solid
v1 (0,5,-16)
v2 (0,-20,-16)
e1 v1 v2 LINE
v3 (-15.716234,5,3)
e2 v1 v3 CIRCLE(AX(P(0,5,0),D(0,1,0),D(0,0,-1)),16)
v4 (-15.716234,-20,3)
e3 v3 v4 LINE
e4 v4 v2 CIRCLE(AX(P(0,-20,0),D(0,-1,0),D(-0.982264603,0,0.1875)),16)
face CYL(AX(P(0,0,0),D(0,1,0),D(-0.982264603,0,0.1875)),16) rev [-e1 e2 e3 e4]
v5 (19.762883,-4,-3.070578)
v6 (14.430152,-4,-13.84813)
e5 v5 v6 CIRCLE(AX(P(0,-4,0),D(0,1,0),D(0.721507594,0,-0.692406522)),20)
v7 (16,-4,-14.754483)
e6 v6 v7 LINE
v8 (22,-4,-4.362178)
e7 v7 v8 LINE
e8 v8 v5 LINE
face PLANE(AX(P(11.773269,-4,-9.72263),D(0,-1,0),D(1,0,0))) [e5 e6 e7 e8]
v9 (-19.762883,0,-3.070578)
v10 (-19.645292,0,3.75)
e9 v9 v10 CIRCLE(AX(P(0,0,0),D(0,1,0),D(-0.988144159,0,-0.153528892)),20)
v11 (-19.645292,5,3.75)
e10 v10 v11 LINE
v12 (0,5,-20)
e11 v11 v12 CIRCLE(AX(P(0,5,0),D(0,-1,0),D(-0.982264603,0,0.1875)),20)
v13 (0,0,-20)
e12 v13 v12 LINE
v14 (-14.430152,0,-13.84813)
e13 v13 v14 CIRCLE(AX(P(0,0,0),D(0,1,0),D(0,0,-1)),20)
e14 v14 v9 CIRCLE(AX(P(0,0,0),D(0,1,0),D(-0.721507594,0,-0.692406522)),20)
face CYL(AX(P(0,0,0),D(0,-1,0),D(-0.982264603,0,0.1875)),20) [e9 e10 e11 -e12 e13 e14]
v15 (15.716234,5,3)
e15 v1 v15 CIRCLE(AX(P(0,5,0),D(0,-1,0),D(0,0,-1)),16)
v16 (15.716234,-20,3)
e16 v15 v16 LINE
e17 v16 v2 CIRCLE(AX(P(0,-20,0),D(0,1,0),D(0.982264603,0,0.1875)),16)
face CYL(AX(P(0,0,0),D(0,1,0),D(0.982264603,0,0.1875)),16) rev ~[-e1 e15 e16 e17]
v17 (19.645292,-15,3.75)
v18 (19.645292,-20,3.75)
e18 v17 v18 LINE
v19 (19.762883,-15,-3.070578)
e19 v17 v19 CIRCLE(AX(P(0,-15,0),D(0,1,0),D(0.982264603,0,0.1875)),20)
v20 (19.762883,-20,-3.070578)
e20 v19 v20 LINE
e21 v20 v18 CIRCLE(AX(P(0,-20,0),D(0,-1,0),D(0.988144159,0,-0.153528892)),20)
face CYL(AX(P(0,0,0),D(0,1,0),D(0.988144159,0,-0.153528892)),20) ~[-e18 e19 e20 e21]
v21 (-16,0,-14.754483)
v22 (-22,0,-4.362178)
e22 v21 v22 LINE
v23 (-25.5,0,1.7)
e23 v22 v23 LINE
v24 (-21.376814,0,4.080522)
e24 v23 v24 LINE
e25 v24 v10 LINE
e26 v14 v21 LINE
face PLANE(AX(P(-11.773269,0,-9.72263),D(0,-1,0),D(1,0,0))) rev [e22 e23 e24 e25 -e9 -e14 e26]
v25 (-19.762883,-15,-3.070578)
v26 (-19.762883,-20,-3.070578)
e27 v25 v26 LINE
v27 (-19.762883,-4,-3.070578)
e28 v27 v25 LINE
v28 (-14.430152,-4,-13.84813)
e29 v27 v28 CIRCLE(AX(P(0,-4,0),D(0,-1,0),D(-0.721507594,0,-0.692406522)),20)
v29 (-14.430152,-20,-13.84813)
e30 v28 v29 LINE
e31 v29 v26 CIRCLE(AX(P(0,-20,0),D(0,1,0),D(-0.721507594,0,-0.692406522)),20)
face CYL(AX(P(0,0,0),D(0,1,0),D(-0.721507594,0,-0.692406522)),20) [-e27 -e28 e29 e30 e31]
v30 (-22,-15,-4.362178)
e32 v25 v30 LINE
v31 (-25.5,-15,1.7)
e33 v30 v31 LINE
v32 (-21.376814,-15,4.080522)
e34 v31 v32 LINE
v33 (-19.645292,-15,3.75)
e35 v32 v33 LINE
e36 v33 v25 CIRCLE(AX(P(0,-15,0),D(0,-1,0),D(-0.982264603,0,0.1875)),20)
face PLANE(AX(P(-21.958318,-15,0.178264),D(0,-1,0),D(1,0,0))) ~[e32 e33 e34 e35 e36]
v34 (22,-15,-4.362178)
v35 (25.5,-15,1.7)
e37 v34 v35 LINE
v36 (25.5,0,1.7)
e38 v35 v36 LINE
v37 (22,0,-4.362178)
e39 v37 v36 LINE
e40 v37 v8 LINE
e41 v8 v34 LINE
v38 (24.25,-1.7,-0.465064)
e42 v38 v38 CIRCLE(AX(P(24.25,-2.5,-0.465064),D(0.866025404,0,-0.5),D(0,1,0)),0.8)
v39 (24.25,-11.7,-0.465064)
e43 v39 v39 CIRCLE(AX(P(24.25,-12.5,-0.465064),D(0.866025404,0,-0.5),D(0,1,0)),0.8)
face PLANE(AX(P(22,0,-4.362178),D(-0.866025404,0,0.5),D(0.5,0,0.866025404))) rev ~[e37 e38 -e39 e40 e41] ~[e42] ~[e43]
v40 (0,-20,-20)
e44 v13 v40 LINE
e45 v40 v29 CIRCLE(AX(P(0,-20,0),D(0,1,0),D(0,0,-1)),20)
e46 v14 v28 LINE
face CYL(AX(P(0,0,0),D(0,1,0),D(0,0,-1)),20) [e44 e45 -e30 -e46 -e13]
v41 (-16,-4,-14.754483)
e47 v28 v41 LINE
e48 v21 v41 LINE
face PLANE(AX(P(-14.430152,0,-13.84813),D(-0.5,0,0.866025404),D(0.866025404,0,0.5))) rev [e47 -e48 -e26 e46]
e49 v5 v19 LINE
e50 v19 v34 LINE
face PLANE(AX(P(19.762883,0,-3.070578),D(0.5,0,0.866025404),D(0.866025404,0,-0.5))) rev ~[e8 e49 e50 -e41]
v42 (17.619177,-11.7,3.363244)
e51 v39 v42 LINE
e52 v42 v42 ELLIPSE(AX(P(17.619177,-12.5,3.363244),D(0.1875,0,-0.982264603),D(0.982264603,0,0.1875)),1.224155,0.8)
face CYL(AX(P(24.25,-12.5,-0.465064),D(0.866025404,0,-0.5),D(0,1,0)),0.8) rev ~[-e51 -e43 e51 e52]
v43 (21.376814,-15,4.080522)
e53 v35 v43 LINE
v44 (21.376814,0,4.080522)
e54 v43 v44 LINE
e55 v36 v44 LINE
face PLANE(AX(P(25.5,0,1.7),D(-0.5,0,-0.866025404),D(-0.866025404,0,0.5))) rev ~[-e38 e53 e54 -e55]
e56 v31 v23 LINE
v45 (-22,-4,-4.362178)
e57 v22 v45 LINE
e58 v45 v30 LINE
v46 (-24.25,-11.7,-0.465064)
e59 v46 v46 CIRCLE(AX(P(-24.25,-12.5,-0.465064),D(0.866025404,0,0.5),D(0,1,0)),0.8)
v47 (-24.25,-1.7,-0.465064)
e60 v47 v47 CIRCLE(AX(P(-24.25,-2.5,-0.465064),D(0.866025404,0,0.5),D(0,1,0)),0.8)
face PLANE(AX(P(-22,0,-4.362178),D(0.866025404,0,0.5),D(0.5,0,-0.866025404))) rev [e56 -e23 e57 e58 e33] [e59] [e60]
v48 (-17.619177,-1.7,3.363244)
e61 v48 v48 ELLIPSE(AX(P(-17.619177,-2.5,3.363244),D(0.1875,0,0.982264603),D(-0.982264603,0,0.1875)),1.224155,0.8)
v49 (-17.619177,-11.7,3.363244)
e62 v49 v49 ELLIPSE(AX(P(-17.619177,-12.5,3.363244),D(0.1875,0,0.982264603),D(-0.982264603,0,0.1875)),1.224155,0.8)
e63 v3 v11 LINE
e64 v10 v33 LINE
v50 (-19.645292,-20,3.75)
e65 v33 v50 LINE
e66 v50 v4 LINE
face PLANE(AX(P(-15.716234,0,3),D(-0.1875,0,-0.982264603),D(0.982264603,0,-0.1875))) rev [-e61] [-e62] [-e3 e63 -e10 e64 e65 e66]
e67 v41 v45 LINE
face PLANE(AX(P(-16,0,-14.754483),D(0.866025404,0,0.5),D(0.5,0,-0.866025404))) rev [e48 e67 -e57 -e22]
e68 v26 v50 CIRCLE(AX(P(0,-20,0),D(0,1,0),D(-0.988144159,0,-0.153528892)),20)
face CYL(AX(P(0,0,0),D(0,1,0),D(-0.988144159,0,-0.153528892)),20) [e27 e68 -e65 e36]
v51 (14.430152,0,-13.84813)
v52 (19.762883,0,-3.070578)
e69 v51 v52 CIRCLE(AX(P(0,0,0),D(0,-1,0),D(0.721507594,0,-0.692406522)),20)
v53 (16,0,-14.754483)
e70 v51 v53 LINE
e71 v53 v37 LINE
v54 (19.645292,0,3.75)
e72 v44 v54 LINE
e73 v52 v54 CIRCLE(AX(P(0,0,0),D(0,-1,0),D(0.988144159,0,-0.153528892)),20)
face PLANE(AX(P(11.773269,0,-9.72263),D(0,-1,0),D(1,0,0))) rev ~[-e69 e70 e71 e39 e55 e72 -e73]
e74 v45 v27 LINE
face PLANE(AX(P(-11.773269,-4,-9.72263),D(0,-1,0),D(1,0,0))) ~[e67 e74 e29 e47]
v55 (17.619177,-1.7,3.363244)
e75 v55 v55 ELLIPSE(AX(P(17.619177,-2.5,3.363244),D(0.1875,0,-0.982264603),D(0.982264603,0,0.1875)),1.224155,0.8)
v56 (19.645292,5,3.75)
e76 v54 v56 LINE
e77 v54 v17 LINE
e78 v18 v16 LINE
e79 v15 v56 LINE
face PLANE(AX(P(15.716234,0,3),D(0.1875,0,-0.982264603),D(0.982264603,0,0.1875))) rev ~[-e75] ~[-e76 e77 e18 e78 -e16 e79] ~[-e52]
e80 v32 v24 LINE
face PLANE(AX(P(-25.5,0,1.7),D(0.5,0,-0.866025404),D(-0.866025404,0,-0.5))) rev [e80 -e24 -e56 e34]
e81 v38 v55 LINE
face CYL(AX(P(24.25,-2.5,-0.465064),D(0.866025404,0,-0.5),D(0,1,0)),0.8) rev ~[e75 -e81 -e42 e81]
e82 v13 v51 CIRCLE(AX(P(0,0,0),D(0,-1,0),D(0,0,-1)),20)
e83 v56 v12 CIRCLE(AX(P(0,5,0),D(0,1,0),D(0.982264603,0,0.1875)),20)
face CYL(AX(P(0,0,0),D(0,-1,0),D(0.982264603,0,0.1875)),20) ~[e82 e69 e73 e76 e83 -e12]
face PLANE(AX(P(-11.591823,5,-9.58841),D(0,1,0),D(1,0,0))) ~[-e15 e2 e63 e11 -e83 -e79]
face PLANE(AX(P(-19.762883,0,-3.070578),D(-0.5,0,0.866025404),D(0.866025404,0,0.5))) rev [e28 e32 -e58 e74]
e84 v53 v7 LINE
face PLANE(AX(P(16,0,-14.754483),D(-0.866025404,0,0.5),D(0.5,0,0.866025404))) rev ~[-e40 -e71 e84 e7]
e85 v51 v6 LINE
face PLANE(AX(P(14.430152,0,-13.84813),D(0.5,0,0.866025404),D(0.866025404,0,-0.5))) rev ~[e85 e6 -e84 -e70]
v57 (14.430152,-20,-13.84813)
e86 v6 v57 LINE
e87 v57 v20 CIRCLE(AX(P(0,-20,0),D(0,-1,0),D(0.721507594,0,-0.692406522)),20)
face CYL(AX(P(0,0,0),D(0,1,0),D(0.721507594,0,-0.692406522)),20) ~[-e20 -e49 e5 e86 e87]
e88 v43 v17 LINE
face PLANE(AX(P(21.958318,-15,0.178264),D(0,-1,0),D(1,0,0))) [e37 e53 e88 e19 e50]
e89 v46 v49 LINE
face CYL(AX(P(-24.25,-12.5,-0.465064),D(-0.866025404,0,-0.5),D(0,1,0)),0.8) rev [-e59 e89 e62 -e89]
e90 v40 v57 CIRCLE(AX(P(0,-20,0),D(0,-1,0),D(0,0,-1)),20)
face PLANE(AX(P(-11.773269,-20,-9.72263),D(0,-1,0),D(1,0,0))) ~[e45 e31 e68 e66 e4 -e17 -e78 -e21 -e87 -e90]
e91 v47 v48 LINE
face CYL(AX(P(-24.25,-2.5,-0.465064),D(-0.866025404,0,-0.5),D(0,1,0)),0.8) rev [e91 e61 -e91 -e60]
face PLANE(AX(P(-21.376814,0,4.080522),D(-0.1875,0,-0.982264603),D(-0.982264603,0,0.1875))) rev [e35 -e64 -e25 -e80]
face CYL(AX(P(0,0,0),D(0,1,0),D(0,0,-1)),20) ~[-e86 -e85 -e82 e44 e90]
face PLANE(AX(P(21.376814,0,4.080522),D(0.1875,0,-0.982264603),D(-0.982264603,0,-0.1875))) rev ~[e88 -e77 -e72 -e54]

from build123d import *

# Parameters (mm, degrees)
F1_DEPTH = 20
F2_DEPTH = 5
F3_DEPTH = 4
F4_DEPTH = 15
F5_R     = 0.8
F6_DEPTH = 8.5841977808


# Not quite as in the source:
# - a feature names something its author has since deleted; it is built from what else it names


with BuildPart() as f1:
    # F0 (on Front) → F1 (new body)
    with BuildSketch(Plane.XZ):
        with BuildLine():
            ThreePointArc((15.7162336455, 3), (12.3288280059, -10.1980390272), (0, -16))
            Line((0, -16), (0, -20))
            ThreePointArc((0, -20), (7.8433854689, -18.397861408), (14.4301518825, -13.8481304387))
            ThreePointArc((14.4301518825, -13.8481304387), (17.9256749339, -8.8696210836), (19.762883185, -3.0705778311))
            ThreePointArc((19.762883185, -3.0705778311), (19.9970282657, 0.3447615687), (19.6452920569, 3.75))
            Line((19.6452920569, 3.75), (15.7162336455, 3))
        make_face()
    extrude(amount=F1_DEPTH)

    # F1_face (on face) → F2 (join)
    with BuildSketch(Plane(origin=(12.1989359317, 0, -10.0905961752), x_dir=(1, 0, 0), z_dir=(0, 1, 0))):
        with BuildLine():
            Line((3.5172977138, -13.0905961752), (7.4463561252, -13.8405961752))
            ThreePointArc((7.4463561252, -13.8405961752), (3.2120990757, 2.6569526088), (-12.1989359317, 9.9094038248))
            Line((-12.1989359317, 9.9094038248), (-12.1989359317, 5.9094038248))
            ThreePointArc((-12.1989359317, 5.9094038248), (0.1298920742, 0.107442852), (3.5172977138, -13.0905961752))
        make_face()
    extrude(amount=F2_DEPTH)

    # F0 (on Front) → F3 (join)
    with BuildSketch(Plane.XZ):
        with BuildLine():
            ThreePointArc((15.7162336455, 3), (12.3288280059, -10.1980390272), (0, -16))
            Line((0, -16), (0, -20))
            ThreePointArc((0, -20), (7.8433854689, -18.397861408), (14.4301518825, -13.8481304387))
            ThreePointArc((14.4301518825, -13.8481304387), (17.9256749339, -8.8696210836), (19.762883185, -3.0705778311))
            ThreePointArc((19.762883185, -3.0705778311), (19.9970282657, 0.3447615687), (19.6452920569, 3.75))
            Line((19.6452920569, 3.75), (15.7162336455, 3))
        make_face()
        with BuildLine():
            Line((21.3768143102, 4.080522368), (19.6452920569, 3.75))
            ThreePointArc((19.6452920569, 3.75), (19.9970282657, 0.3447615687), (19.762883185, -3.0705778311))
            Line((19.762883185, -3.0705778311), (22, -4.3621778265))
            Line((22, -4.3621778265), (25.5, 1.7))
            Line((25.5, 1.7), (21.3768143102, 4.080522368))
        make_face()
        with BuildLine():
            ThreePointArc((19.762883185, -3.0705778311), (17.9256749339, -8.8696210836), (14.4301518825, -13.8481304387))
            Line((14.4301518825, -13.8481304387), (16, -14.7544826719))
            Line((16, -14.7544826719), (22, -4.3621778265))
            Line((22, -4.3621778265), (19.762883185, -3.0705778311))
        make_face()
    extrude(amount=F3_DEPTH)

    # F0 (on Front) → F4 (join)
    with BuildSketch(Plane.XZ):
        with BuildLine():
            Line((21.3768143102, 4.080522368), (19.6452920569, 3.75))
            ThreePointArc((19.6452920569, 3.75), (19.9970282657, 0.3447615687), (19.762883185, -3.0705778311))
            Line((19.762883185, -3.0705778311), (22, -4.3621778265))
            Line((22, -4.3621778265), (25.5, 1.7))
            Line((25.5, 1.7), (21.3768143102, 4.080522368))
        make_face()
    extrude(amount=F4_DEPTH)

    # F5 (on face) → F6 (cut, through all)
    with BuildSketch(Plane(origin=(18.3888784068, 0, -10.6168238983), x_dir=(0, 1, 0), z_dir=(0.8660254038, 0, -0.5))):
        with Locations((-12.5, 11.7222431864)):
            Circle(F5_R)
        with Locations((-2.5, 11.7222431864)):
            Circle(F5_R)
    extrude(amount=-F6_DEPTH, mode=Mode.SUBTRACT)

    # F7: F1 across plane


with BuildPart() as f1_1:
    add(f1.part)
    add(f1.part.mirror(Plane.YZ))


solid = f1_1.part
